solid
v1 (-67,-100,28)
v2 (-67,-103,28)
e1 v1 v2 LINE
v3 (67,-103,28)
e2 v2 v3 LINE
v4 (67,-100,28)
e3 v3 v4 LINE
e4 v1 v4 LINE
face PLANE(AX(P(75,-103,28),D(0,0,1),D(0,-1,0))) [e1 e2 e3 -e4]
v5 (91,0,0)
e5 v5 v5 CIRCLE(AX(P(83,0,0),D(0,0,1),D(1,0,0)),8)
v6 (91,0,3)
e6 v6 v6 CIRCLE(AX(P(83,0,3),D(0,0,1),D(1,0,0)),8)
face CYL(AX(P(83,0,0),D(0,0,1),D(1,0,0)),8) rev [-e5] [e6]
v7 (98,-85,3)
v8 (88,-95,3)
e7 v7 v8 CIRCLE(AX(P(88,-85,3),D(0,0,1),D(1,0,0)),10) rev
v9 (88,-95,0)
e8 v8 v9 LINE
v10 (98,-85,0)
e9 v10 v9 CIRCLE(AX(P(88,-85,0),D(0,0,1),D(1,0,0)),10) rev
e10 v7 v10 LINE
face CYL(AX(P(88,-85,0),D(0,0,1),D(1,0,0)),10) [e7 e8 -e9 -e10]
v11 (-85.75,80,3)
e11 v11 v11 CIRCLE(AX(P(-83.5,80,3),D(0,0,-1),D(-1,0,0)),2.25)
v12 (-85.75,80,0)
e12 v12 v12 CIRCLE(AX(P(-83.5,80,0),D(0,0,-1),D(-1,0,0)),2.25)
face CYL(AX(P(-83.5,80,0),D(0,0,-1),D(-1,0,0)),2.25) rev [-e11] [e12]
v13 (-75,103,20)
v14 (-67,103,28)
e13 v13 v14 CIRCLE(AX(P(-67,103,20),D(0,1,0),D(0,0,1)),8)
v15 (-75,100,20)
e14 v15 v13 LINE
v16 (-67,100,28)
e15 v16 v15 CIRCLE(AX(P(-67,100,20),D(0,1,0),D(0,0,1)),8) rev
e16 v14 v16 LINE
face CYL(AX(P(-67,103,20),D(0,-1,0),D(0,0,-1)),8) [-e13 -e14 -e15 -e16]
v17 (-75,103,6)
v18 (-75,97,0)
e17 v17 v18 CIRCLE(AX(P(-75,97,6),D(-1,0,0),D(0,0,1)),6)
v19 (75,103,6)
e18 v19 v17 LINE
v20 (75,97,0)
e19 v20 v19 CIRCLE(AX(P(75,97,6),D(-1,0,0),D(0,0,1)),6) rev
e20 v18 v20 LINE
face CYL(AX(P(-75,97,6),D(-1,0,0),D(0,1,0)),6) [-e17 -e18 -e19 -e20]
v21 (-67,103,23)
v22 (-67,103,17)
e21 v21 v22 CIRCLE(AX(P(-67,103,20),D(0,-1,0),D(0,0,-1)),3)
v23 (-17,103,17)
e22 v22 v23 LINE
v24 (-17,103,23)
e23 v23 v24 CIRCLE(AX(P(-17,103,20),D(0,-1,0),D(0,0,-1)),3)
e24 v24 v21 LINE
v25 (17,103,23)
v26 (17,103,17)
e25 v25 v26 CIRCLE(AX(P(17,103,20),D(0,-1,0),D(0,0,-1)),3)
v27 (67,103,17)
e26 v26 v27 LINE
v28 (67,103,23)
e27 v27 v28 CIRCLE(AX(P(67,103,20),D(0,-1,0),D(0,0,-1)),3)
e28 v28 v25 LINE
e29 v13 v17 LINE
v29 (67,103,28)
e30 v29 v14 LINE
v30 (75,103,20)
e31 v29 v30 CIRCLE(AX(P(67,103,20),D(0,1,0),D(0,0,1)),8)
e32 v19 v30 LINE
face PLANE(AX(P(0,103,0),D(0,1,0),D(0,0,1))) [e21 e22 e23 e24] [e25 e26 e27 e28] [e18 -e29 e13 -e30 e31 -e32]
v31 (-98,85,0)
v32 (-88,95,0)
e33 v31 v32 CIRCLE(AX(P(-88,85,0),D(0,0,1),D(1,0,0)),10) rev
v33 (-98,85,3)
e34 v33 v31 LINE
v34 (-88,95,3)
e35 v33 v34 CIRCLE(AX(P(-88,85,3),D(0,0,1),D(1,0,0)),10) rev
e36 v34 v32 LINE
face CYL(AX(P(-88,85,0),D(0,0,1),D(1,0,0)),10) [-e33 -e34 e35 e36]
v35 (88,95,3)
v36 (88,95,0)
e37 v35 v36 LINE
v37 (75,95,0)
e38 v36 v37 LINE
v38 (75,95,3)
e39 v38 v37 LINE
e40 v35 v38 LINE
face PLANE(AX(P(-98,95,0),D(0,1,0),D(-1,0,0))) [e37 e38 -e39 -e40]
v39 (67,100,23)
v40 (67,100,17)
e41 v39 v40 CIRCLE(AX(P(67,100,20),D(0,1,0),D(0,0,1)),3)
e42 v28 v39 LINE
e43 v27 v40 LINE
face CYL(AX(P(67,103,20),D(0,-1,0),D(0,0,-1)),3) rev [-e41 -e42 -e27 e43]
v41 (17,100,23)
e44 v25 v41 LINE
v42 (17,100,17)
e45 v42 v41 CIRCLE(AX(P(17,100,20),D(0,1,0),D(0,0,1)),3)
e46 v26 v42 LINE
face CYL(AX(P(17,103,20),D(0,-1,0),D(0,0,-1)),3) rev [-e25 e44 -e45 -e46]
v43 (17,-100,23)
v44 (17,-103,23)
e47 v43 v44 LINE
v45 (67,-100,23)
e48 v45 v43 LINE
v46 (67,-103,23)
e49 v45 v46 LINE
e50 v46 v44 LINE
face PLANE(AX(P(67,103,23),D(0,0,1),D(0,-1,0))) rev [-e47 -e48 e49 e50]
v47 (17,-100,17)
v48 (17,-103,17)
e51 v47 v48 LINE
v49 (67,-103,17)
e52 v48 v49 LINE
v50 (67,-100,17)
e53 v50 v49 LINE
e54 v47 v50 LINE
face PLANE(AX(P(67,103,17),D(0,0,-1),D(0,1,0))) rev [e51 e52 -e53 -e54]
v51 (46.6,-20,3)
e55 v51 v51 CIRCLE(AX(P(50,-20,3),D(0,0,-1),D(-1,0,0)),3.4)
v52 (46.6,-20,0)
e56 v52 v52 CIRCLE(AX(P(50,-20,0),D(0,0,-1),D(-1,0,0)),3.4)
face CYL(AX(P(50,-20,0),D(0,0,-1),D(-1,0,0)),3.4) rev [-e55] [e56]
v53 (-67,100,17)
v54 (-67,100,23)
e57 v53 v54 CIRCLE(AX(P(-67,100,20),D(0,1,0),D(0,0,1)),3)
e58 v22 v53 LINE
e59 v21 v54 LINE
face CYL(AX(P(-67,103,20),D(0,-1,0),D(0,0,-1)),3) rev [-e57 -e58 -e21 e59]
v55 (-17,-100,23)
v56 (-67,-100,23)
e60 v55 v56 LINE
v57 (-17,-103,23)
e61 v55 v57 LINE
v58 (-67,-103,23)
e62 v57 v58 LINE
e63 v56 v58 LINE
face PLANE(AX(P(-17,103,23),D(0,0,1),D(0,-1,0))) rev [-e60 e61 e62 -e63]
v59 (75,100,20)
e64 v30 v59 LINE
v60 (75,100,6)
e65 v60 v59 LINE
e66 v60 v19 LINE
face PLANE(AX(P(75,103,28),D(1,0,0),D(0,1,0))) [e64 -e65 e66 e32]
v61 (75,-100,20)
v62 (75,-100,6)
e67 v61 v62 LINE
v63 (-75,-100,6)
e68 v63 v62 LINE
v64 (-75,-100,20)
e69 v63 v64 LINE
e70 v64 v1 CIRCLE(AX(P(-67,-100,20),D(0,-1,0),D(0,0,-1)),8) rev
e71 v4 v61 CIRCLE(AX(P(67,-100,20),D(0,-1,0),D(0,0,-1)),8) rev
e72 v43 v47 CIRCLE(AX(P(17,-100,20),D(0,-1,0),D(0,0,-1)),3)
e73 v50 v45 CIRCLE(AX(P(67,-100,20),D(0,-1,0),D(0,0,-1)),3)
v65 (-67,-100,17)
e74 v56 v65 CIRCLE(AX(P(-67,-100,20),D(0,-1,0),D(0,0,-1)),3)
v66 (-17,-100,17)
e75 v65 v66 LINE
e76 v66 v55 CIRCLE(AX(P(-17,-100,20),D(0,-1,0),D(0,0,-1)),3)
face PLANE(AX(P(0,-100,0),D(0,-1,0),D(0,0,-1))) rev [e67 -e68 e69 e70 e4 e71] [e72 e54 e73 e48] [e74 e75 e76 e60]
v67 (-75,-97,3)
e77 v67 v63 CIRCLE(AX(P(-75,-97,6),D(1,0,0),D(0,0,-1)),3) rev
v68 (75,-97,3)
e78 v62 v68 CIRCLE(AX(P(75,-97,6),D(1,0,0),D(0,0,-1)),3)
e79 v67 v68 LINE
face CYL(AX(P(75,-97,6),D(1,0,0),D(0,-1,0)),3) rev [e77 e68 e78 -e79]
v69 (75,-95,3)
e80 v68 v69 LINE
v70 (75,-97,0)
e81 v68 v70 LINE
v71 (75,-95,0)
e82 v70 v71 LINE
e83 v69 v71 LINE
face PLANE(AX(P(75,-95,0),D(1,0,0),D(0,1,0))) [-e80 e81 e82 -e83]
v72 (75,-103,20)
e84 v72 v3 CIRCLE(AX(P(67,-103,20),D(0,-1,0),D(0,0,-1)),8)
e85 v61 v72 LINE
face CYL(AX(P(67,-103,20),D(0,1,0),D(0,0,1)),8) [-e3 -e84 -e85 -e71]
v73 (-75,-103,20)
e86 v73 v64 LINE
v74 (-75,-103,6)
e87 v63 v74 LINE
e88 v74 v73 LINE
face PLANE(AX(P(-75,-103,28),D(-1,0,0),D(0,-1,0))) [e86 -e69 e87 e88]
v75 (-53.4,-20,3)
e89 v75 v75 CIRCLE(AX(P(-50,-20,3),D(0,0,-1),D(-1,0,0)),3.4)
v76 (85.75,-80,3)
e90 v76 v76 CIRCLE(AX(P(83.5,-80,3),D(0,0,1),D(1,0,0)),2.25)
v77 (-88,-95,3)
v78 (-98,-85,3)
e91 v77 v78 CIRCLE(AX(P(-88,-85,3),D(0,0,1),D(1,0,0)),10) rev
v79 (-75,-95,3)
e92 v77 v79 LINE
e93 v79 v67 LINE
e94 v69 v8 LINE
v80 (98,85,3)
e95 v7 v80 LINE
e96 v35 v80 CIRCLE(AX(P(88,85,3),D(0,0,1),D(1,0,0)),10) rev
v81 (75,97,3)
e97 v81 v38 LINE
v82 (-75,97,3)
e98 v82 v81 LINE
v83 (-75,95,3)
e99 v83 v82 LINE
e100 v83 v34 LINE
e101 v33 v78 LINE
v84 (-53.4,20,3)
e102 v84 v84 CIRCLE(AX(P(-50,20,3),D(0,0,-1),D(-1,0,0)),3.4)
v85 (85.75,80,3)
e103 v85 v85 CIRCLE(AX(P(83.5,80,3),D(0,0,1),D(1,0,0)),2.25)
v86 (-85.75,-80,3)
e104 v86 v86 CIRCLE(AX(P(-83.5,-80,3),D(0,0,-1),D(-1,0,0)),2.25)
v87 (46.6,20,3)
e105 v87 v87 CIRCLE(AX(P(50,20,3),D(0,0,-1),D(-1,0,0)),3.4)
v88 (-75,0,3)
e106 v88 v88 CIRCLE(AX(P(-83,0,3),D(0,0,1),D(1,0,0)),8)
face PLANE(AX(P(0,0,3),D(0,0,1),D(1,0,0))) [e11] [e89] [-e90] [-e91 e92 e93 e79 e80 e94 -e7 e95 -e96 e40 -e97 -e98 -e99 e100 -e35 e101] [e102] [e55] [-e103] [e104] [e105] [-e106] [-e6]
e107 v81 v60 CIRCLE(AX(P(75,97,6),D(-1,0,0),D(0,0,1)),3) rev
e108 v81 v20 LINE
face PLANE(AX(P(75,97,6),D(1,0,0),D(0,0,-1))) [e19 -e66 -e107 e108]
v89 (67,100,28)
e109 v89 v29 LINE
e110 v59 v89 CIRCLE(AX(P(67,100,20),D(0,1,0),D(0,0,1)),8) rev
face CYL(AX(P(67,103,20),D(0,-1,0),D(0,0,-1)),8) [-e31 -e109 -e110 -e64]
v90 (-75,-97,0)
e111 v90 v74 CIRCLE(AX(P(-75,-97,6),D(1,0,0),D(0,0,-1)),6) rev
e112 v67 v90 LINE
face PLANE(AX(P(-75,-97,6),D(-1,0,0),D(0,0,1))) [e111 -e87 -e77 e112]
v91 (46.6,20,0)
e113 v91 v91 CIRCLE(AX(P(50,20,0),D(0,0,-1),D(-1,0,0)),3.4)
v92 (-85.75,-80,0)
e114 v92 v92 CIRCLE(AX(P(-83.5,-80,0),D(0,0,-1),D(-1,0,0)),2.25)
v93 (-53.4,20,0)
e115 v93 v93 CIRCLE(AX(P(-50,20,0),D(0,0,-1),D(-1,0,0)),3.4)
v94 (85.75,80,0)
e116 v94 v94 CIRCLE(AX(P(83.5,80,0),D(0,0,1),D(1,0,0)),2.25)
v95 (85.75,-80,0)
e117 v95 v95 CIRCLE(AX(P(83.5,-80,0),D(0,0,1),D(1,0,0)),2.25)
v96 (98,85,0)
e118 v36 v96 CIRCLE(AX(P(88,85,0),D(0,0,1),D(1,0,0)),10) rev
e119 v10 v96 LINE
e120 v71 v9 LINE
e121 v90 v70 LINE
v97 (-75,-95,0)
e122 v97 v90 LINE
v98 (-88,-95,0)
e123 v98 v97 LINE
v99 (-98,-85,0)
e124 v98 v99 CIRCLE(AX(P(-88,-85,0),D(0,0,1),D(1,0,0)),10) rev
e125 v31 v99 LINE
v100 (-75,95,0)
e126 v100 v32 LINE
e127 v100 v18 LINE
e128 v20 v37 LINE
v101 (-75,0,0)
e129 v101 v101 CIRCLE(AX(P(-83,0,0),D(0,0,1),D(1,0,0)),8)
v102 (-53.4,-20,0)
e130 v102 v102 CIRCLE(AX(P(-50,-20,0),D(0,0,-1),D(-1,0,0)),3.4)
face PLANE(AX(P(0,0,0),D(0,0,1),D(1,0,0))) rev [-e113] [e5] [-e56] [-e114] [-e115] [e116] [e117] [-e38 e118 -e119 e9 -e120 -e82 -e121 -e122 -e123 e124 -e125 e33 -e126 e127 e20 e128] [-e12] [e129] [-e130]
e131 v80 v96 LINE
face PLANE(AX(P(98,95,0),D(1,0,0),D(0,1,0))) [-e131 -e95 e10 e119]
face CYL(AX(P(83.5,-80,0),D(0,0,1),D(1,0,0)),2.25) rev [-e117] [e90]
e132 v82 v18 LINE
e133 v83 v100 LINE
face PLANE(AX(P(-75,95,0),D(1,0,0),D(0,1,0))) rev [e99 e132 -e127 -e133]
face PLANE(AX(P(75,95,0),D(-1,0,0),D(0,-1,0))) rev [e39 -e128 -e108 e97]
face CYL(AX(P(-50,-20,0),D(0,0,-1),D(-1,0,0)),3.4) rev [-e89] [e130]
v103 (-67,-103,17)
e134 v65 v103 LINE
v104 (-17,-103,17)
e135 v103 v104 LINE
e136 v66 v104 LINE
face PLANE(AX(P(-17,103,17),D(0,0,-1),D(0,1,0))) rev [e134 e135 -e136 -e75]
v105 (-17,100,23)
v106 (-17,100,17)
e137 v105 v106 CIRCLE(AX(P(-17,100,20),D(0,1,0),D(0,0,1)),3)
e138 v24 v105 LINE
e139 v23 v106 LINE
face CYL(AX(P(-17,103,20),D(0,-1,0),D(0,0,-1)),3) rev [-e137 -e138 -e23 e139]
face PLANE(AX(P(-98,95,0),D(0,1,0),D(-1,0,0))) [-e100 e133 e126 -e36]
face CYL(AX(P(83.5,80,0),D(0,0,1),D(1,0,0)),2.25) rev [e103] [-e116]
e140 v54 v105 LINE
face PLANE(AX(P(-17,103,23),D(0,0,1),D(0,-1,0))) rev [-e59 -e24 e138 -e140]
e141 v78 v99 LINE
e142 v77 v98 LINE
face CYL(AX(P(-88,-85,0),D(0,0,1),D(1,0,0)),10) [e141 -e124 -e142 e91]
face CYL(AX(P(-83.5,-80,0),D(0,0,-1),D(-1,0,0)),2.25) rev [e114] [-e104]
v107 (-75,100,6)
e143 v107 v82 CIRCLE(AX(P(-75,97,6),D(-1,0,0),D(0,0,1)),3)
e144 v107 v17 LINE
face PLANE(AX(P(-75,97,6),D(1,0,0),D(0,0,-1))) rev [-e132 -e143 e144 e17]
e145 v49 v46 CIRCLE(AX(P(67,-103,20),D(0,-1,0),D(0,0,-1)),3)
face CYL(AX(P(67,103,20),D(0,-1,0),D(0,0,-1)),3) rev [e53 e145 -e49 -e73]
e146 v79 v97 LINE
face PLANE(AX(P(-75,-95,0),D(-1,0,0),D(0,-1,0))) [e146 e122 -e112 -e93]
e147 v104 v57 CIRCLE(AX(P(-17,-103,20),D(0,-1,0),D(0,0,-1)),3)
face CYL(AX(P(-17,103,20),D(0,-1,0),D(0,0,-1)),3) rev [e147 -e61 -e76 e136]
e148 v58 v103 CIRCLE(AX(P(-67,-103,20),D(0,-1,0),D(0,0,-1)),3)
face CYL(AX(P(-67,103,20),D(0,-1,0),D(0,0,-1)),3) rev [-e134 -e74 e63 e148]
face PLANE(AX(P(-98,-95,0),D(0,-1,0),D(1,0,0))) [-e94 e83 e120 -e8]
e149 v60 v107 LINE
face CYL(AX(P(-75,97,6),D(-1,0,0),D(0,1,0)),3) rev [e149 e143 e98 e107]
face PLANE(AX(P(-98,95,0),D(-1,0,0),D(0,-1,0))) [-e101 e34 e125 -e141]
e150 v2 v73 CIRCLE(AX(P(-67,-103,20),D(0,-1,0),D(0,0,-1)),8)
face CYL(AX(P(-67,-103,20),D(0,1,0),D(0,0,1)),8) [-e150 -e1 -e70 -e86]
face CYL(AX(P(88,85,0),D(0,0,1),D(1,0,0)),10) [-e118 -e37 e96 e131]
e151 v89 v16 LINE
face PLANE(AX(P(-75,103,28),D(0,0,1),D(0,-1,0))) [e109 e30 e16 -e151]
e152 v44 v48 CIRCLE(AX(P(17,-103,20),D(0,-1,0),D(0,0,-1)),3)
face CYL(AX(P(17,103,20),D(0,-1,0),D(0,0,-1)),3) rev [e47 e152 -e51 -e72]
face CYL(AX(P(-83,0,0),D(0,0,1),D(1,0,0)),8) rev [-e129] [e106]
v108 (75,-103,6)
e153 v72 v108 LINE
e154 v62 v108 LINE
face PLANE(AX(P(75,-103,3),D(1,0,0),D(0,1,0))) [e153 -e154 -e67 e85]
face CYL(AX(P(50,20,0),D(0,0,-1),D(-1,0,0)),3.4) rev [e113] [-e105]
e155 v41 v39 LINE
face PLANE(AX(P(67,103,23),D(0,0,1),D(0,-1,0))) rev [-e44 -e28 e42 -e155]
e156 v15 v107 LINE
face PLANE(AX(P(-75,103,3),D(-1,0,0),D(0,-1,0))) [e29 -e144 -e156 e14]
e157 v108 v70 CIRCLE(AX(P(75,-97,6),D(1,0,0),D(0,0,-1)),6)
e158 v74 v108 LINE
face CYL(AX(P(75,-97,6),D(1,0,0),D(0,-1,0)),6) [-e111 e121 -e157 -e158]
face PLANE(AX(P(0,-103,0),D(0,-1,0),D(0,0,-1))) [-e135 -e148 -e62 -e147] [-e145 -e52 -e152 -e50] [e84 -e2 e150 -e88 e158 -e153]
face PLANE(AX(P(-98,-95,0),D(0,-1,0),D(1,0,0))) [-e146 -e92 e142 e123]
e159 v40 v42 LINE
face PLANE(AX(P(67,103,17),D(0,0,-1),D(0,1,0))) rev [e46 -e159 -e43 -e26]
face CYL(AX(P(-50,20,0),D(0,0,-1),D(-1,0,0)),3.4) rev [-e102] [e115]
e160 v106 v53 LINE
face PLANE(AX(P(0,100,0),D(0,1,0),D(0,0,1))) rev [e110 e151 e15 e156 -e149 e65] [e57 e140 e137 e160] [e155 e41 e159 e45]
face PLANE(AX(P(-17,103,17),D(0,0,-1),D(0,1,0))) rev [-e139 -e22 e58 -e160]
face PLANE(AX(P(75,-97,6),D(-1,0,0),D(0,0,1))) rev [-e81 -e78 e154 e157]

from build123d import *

# Parameters (mm, degrees)
CROQUIS1_W                       = 196
CROQUIS1_H                       = 190
SALIENTE_EXTRUIR1_DEPTH          = 3
CROQUIS3_R                       = 8
CORTAR_EXTRUIR1_DEPTH            = 50
REDONDEO1_R                      = 10
TALADRO_ROSCADO_M81_D            = 6.8
TALADRO_ROSCADO_M81_DEPTH        = 17
TALADRO_ROSCADO_M81_TIP          = 2.042926105
MATRIZL1_COUNT                   = 2
MATRIZL1_PITCH                   = 160
CROQUIS12_W                      = 150
CROQUIS12_H                      = 2
SALIENTE_EXTRUIR6_DEPTH          = 3
BRIDA_DE_ARISTA1_DEPTH           = 150
BRIDA_DE_ARISTA1_BEND_DEPTH      = 150
REDONDEO5_R                      = 8
TALADRO_DE_MARGEN_PARA_M51_D     = 5.5
TALADRO_DE_MARGEN_PARA_M51_DEPTH = 500
TALADRO_DE_MARGEN_PARA_M51_TIP   = 1.652366702
CORTAR_EXTRUIR2_DEPTH            = 230.834723225


# Sheet-metal steps are written as plain solids
with BuildPart() as part:
    # Croquis1 → Saliente-Extruir1 (new body)
    with BuildSketch(Plane.XY):
        Rectangle(CROQUIS1_W, CROQUIS1_H)
    extrude(amount=SALIENTE_EXTRUIR1_DEPTH)

    # Croquis3 → Cortar-Extruir1 (cut, symmetric)
    with BuildSketch(Plane.XY.offset(3)):
        with Locations((83, 0)):
            Circle(CROQUIS3_R)
        with Locations((-83, 0)):
            Circle(CROQUIS3_R)
    extrude(amount=CORTAR_EXTRUIR1_DEPTH, both=True, mode=Mode.SUBTRACT)

    # Redondeo1
    redondeo1_edges = [part.edges().sort_by_distance(p)[0] for p in [
        (-98, 95, 1.5),
        (98, 95, 1.5),
        (98, -95, 1.5),
        (-98, -95, 1.5),
    ]]
    fillet(redondeo1_edges, radius=REDONDEO1_R)

    # Taladro roscado M81
    with Locations(Plane(origin=(0, 0, 0), x_dir=(-1, 0, 0), z_dir=(0, 0, -1))):
        with Locations((-50, 20), (-50, -20), (50, 20), (50, -20)):
            Hole(TALADRO_ROSCADO_M81_D / 2, depth=TALADRO_ROSCADO_M81_DEPTH)
            with Locations((0, 0, -(TALADRO_ROSCADO_M81_DEPTH + TALADRO_ROSCADO_M81_TIP / 2))):  # 118° drill point
                Cone(0, TALADRO_ROSCADO_M81_D / 2, TALADRO_ROSCADO_M81_TIP, mode=Mode.SUBTRACT)

    # Croquis9 → Taladro de margen para M41 (revolve, cut)
    with BuildSketch(Plane(origin=(-83.5, -80, 0), x_dir=(0, 1, 0), z_dir=(1, 0, 0))):
        Polygon((0, 0), (0, 501.351936393), (2.25, 500), (2.25, 0), align=None)
    taladro_de_margen_para_m41 = revolve(axis=Axis((-83.5, -80, -6.35), (0, 0, 1)), mode=Mode.SUBTRACT)

    # MatrizL1: Taladro de margen para M41 ×2
    with Locations(*[(0, i * MATRIZL1_PITCH, 0) for i in range(1, MATRIZL1_COUNT)]):
        add(taladro_de_margen_para_m41, mode=Mode.SUBTRACT)

    # Simetría3: Taladro de margen para M41 across plane
    add(taladro_de_margen_para_m41.mirror(Plane(origin=(0, 0, 0), x_dir=(0, 0, 1), z_dir=(1, 0, 0))), mode=Mode.SUBTRACT)

    # Simetría3 copy 1 sketch → Simetría3 copy 1 (revolve, cut)
    with BuildSketch(Plane(origin=(83.5, 80, 0), x_dir=(0, 1, 0), z_dir=(-1, 0, 0))):
        Polygon((0, 0), (0, -501.351936393), (2.25, -500), (2.25, 0), align=None)
    revolve(axis=Axis((83.5, 80, -6.35), (0, 0, -1)), mode=Mode.SUBTRACT)

    # Croquis12 → Saliente-Extruir6 (add)
    with BuildSketch(Plane.XY.offset(3)):
        with Locations((0, 96)):
            Rectangle(CROQUIS12_W, CROQUIS12_H)
    saliente_extruir6 = extrude(amount=-SALIENTE_EXTRUIR6_DEPTH)

    # Simetría4: Saliente-Extruir6 across plane
    add(saliente_extruir6.mirror(Plane.ZX))

    # Brida de arista1 section (across the edge) → Brida de arista1 (add)
    with BuildSketch(Plane(origin=(-75, -100, 3), x_dir=(0, 1, 0), z_dir=(1, 0, 0))):
        with BuildLine():
            Line((-3, 3), (-3, 25))
            Line((-3, 25), (0, 25))
            Line((0, 25), (0, 3))
            ThreePointArc((0, 3), (0.878679656, 0.878679656), (3, 0))
            Line((3, 0), (3, -3))
            ThreePointArc((3, -3), (-1.242640687, -1.242640687), (-3, 3))
        make_face()
    extrude(amount=BRIDA_DE_ARISTA1_DEPTH)

    # Brida de arista1 section 2 (across the edge) → Brida de arista1 bend (add)
    with BuildSketch(Plane(origin=(75, 100, 3), x_dir=(0, -1, 0), z_dir=(-1, 0, 0))):
        with BuildLine():
            Line((-3, 3), (-3, 25))
            Line((-3, 25), (0, 25))
            Line((0, 25), (0, 3))
            ThreePointArc((0, 3), (0.878679656, 0.878679656), (3, 0))
            Line((3, 0), (3, -3))
            ThreePointArc((3, -3), (-1.242640687, -1.242640687), (-3, 3))
        make_face()
    extrude(amount=BRIDA_DE_ARISTA1_BEND_DEPTH)

    # Redondeo5
    redondeo5_edges = [part.edges().sort_by_distance(p)[0] for p in [
        (-75, -101.5, 28),
        (75, -101.5, 28),
        (75, 101.5, 28),
        (-75, 101.5, 28),
    ]]
    fillet(redondeo5_edges, radius=REDONDEO5_R)

    # Taladro de margen para M51
    with Locations(Plane(origin=(0, -103, 0), x_dir=(-1, 0, 0), z_dir=(0, -1, 0))):
        with Locations((67, -20), (-67, -20), (17, -20), (-17, -20)):
            Hole(TALADRO_DE_MARGEN_PARA_M51_D / 2, depth=TALADRO_DE_MARGEN_PARA_M51_DEPTH)
            with Locations((0, 0, -(TALADRO_DE_MARGEN_PARA_M51_DEPTH + TALADRO_DE_MARGEN_PARA_M51_TIP / 2))):  # 118° drill point
                Cone(0, TALADRO_DE_MARGEN_PARA_M51_D / 2, TALADRO_DE_MARGEN_PARA_M51_TIP, mode=Mode.SUBTRACT)

    # Croquis25 → Cortar-Extruir2 (cut, through all)
    with BuildSketch(Plane.XZ.offset(103)):
        with BuildLine():
            Line((67, 17), (17, 17))
            ThreePointArc((17, 17), (14, 20), (17, 23))
            Line((17, 23), (67, 23))
            ThreePointArc((67, 23), (70, 20), (67, 17))
        make_face()
        with BuildLine():
            Line((-17, 17), (-67, 17))
            ThreePointArc((-67, 17), (-70, 20), (-67, 23))
            Line((-67, 23), (-17, 23))
            ThreePointArc((-17, 23), (-14, 20), (-17, 17))
        make_face()
    extrude(amount=-CORTAR_EXTRUIR2_DEPTH, mode=Mode.SUBTRACT)


solid = part.part
